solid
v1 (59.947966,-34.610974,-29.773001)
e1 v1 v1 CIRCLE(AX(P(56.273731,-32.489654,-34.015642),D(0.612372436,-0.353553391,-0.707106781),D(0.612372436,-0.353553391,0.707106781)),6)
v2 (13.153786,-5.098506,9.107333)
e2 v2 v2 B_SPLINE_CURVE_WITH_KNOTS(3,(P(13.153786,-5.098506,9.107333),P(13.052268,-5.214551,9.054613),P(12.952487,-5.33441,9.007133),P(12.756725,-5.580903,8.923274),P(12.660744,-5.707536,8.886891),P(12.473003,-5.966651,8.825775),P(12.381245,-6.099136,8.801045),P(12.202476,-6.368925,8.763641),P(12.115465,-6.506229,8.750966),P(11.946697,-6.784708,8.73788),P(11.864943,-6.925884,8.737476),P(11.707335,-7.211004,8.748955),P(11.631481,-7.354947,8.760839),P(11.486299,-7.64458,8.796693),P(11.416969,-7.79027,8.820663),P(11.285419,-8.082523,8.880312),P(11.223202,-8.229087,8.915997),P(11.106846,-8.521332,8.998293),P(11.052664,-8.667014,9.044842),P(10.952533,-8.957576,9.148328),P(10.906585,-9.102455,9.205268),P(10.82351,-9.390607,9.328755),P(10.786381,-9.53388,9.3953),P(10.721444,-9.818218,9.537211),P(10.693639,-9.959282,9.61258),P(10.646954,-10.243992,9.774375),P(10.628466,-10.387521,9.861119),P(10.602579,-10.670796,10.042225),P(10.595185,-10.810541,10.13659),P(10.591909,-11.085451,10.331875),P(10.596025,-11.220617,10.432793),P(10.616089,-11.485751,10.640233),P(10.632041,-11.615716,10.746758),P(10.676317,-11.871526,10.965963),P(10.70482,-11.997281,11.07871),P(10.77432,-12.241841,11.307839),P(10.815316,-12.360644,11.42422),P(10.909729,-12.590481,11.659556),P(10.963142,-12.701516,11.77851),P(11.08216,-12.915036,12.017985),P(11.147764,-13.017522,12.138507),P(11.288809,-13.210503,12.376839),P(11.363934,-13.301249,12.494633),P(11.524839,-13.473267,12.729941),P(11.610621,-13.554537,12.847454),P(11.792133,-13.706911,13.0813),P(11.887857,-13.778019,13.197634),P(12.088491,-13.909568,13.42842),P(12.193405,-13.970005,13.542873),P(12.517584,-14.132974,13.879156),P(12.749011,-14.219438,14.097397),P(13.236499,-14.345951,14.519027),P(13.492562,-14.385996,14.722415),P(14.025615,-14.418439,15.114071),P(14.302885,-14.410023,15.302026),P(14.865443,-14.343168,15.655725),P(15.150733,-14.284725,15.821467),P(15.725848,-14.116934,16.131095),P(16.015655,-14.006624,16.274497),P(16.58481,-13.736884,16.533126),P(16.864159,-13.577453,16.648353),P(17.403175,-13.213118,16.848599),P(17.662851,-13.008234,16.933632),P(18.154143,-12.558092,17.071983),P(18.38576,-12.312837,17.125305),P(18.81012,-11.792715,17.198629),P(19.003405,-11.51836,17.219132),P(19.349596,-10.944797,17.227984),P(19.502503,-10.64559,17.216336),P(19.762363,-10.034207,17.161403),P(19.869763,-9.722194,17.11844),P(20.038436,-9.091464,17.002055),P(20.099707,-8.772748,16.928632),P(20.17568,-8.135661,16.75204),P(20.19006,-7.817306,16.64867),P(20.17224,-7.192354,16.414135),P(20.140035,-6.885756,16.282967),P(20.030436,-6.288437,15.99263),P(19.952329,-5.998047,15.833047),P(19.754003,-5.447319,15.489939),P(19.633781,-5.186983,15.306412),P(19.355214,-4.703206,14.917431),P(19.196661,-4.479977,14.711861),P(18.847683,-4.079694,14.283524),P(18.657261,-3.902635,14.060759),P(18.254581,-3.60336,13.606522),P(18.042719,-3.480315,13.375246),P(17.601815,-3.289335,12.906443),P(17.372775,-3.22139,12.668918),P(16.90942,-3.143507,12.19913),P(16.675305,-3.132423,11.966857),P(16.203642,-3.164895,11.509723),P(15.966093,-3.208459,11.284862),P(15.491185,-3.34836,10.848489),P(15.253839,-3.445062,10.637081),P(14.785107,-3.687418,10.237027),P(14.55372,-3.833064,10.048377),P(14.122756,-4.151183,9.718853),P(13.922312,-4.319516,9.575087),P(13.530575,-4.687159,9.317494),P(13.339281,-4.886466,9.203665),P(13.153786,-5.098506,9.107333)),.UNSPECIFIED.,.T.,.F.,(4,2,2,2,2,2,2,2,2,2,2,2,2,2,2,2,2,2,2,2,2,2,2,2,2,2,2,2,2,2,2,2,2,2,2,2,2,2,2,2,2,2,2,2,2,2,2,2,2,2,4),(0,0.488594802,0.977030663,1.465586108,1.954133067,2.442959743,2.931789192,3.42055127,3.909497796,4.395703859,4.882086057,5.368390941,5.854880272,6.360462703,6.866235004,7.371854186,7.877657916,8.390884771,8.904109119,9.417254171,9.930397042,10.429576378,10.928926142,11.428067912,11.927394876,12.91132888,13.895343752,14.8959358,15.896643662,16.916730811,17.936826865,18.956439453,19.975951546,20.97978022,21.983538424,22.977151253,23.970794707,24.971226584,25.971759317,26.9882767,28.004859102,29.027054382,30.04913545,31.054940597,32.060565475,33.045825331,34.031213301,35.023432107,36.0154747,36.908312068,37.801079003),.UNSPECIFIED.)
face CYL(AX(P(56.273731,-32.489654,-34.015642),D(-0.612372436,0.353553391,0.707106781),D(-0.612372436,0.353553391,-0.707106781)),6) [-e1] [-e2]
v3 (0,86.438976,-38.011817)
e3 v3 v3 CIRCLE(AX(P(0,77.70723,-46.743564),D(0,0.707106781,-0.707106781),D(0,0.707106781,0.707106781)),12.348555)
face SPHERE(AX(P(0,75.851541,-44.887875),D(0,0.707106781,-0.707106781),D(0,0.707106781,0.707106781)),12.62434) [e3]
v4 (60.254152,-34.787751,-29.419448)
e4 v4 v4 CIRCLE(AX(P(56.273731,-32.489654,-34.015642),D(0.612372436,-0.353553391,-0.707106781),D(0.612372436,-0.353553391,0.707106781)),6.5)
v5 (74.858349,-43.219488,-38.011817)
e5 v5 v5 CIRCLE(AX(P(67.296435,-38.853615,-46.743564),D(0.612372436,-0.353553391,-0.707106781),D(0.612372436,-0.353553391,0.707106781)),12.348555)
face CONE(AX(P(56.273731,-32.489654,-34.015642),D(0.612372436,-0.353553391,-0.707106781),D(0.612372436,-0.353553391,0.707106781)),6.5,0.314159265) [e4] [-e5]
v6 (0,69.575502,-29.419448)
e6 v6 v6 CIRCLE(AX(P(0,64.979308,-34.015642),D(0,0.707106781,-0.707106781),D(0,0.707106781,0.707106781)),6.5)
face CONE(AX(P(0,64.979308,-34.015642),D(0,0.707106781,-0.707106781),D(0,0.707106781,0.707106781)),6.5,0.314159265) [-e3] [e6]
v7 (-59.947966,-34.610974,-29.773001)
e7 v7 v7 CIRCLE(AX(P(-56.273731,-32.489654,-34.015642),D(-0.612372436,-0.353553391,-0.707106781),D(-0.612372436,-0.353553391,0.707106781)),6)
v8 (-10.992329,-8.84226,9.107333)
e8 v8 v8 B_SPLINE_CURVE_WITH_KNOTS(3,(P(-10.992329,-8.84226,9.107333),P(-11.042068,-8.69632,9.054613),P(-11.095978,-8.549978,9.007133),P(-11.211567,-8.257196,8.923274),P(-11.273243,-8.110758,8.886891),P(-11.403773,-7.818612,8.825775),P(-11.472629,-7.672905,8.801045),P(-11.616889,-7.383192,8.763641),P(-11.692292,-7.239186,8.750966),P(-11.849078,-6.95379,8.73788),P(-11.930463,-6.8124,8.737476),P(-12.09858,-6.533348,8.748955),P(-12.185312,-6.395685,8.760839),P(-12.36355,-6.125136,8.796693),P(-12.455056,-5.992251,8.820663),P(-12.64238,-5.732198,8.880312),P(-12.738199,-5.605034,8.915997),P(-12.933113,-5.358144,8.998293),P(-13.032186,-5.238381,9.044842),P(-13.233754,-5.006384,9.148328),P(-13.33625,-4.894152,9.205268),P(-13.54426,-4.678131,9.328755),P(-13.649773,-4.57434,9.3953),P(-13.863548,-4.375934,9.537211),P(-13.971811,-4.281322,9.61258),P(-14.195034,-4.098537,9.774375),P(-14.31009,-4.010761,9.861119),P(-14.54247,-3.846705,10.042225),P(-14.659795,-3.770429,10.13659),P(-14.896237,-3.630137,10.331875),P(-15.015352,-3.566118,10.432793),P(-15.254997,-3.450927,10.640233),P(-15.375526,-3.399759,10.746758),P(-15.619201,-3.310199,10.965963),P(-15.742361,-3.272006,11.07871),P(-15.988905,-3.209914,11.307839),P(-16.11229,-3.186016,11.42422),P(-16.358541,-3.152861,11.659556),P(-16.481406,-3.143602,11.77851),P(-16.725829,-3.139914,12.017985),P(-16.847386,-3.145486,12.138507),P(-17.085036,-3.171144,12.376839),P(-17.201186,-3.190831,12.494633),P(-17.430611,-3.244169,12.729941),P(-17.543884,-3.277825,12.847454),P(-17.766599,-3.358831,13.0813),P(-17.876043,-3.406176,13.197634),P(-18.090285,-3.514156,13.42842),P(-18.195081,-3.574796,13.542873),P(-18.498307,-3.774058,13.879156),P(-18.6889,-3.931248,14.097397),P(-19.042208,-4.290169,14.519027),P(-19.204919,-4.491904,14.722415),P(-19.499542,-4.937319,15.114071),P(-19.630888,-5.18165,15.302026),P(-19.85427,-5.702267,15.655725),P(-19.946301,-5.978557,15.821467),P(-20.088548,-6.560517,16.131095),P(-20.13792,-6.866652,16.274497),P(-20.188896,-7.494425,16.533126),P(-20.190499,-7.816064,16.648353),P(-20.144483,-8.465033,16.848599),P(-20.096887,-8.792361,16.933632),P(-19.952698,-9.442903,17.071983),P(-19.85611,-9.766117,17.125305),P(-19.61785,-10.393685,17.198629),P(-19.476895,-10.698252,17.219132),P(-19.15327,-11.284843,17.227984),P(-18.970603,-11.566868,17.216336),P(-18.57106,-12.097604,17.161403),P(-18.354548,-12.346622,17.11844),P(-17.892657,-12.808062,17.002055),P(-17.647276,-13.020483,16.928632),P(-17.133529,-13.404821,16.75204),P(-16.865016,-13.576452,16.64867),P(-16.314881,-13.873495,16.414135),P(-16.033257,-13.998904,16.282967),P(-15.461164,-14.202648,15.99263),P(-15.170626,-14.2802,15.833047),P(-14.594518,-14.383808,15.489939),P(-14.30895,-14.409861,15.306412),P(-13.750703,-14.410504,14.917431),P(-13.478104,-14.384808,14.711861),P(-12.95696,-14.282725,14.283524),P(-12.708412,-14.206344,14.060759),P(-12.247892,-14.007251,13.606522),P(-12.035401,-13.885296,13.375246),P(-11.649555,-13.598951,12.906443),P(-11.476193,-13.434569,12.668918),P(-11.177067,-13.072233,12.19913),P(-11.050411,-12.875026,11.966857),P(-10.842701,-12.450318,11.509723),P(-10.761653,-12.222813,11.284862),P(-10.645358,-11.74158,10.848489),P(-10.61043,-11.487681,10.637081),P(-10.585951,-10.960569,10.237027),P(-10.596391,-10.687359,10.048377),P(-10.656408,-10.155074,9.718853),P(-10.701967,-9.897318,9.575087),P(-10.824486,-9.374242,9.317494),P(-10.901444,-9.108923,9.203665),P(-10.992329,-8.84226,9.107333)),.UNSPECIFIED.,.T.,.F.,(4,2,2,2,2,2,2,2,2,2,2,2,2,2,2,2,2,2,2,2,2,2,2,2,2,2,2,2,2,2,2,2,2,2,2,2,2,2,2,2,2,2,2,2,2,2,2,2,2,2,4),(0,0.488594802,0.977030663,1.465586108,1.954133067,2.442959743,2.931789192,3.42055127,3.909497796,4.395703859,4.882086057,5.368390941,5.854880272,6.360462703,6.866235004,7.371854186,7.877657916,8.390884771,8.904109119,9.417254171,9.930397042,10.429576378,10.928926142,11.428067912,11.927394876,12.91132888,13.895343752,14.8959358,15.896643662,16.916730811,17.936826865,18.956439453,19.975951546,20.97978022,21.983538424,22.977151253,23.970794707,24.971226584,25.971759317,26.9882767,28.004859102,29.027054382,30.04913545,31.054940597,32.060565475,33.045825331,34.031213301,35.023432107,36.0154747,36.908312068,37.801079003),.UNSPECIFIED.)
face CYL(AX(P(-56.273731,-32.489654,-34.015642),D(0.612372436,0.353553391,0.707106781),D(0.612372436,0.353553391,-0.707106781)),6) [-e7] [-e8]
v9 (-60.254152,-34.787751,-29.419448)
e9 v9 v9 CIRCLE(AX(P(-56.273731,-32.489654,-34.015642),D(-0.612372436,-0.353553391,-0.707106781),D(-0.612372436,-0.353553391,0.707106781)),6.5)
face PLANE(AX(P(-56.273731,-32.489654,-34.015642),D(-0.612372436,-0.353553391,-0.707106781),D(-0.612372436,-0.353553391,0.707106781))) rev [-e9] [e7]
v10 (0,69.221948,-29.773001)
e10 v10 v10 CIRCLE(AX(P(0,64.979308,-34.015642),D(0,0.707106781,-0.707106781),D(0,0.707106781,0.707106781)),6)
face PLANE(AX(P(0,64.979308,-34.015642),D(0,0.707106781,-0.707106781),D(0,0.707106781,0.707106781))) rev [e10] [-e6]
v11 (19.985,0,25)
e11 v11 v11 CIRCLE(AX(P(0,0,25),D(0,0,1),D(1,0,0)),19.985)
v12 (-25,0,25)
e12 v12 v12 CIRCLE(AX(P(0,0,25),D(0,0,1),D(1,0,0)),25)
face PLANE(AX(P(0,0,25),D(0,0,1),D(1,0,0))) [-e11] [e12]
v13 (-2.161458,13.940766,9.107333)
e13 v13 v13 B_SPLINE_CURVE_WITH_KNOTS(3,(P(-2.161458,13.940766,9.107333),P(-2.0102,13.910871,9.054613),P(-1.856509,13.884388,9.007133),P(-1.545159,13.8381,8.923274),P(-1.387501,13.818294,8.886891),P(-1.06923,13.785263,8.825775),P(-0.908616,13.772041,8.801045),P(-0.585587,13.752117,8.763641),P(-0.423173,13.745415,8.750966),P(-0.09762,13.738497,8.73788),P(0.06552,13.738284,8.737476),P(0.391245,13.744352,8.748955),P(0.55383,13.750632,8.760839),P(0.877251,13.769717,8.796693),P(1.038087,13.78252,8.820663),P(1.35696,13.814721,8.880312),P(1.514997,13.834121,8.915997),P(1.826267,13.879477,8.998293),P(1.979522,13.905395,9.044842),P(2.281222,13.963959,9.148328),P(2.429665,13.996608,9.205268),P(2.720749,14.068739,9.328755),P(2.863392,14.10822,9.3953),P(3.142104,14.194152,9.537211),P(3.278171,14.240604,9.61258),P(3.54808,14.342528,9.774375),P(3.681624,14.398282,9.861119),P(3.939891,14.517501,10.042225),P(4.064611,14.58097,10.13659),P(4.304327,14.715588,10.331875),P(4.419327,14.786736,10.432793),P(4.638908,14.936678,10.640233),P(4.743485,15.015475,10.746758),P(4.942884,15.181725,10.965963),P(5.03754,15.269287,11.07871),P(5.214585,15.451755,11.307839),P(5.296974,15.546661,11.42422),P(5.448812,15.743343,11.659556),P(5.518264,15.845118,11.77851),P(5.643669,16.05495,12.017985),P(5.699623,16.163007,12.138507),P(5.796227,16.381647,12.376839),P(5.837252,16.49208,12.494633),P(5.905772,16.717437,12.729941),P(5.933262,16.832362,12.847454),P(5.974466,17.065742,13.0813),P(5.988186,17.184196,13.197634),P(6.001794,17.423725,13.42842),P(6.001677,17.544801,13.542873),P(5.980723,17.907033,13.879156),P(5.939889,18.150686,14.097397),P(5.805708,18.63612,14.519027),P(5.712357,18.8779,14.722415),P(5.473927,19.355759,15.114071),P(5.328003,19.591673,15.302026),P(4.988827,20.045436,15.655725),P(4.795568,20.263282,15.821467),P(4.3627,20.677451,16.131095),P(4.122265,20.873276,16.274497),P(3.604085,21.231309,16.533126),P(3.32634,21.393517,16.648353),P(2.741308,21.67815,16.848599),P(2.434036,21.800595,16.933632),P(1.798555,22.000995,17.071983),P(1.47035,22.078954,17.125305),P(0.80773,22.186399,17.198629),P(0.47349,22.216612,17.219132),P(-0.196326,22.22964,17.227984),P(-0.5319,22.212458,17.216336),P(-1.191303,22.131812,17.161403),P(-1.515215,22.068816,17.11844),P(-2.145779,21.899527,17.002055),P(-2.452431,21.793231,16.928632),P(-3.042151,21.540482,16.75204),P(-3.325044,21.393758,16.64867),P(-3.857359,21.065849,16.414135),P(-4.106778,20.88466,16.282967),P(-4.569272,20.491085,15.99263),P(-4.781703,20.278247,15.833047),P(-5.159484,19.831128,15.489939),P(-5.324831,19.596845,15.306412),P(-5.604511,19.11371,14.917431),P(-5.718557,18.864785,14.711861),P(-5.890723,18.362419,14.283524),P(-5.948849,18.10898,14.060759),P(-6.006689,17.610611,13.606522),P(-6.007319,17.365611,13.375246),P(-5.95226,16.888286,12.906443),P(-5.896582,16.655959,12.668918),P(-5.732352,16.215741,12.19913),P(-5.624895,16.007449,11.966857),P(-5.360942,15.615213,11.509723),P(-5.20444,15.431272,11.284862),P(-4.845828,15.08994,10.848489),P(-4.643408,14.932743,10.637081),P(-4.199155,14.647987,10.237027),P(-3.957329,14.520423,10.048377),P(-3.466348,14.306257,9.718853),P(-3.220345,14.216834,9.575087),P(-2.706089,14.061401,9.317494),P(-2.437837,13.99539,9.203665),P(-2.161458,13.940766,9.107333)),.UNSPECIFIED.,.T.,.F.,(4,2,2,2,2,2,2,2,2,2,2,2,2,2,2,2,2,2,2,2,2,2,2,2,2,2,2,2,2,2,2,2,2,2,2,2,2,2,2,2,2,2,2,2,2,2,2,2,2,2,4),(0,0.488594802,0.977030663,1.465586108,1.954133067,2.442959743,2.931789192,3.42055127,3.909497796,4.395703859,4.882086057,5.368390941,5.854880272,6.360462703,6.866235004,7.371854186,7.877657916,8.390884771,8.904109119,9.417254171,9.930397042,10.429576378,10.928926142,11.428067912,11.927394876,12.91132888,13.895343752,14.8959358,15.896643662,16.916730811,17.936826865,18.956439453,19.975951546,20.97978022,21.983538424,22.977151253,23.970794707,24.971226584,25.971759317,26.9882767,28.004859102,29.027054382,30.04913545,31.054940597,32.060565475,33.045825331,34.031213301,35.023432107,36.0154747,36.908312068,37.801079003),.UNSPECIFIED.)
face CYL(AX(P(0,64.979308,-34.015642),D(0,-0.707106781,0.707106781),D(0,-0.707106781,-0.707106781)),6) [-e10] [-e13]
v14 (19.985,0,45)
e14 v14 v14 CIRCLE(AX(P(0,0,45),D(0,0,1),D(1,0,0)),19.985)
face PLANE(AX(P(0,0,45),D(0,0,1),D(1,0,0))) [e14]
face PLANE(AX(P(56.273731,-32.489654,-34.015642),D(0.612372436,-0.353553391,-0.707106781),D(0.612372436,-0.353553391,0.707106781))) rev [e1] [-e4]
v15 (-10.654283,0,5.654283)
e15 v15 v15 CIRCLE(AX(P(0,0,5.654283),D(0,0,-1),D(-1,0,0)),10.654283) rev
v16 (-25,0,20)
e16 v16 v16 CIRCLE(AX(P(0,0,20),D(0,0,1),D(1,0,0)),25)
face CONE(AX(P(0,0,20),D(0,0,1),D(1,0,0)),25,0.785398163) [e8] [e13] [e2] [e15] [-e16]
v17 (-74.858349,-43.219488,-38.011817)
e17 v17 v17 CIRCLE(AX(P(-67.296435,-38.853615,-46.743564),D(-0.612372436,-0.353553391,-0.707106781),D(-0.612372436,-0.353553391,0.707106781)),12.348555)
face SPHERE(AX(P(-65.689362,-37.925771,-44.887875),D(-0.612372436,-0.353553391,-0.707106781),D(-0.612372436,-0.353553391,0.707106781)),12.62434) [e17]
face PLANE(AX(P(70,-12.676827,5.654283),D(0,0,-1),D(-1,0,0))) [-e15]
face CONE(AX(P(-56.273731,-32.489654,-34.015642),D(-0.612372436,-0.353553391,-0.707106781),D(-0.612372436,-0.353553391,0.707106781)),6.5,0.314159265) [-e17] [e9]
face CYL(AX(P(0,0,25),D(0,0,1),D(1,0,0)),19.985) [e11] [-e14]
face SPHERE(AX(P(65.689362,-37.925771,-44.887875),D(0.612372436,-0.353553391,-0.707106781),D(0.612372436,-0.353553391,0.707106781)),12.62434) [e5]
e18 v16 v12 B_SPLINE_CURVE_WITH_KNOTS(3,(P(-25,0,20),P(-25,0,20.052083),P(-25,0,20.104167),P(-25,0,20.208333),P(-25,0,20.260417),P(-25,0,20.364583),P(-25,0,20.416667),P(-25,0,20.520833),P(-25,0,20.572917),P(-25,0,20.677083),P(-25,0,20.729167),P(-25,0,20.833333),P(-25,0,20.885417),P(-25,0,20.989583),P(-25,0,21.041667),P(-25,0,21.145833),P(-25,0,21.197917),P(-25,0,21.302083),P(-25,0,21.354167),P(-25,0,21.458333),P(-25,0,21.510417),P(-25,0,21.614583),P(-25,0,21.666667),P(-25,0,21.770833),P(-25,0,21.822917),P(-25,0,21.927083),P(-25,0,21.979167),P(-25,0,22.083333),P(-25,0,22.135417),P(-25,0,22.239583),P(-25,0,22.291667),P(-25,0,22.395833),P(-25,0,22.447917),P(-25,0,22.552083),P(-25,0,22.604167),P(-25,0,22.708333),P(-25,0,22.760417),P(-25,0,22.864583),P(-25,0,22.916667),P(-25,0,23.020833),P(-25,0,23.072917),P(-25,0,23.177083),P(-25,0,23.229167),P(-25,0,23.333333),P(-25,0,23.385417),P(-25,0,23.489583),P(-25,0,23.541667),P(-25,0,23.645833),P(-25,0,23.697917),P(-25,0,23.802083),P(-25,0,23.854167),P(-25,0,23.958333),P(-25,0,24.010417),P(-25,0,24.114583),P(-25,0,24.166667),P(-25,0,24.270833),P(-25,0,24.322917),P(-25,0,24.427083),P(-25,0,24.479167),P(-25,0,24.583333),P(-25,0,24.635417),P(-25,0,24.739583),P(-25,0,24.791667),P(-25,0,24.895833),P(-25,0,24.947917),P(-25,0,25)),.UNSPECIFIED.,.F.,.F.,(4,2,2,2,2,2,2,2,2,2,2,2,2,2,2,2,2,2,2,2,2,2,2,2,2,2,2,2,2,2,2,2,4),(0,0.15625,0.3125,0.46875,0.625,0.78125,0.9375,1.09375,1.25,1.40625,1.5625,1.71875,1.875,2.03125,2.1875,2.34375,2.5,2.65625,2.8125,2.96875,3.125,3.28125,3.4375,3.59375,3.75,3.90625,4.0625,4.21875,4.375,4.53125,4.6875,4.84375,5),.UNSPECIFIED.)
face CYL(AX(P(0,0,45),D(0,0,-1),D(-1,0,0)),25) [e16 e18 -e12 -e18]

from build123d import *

# Parameters (mm, degrees)
SKETCH1_R                   = 25
BOSS_EXTRUDE1_DEPTH         = 45
CUT_EXTRUDE1_START          = -20
SKETCH2_R                   = 25
SKETCH2_R_2                 = 19.985
CUT_EXTRUDE1_DEPTH          = 20
CHAMFER1_SIZE               = 20
SKETCH3_R                   = 6
BOSS_EXTRUDE2_DEPTH         = 70
CUT_EXTRUDE2_DEPTH          = 70
CUT_EXTRUDE2_DEPTH_BACK     = 70
SKETCH4_W                   = 11.30856595
SKETCH4_H                   = 25.35365412
SKETCH5_R                   = 6.5
BOSS_EXTRUDE3_DEPTH         = 18
BOSS_EXTRUDE3_DRAFT         = -18
CIRPATTERN1_COUNT           = 3
CIRPATTERN1_COPY_1_SKETCH_R = 6.5
CIRPATTERN1_COPY_1_DEPTH    = 18
CIRPATTERN1_COPY_1_DRAFT    = -18
CIRPATTERN1_COPY_2_SKETCH_R = 6.5
CIRPATTERN1_COPY_2_DEPTH    = 18
CIRPATTERN1_COPY_2_DRAFT    = -18


# Read off the part's stored shape, not the designer's step: Dome1
with BuildPart() as part:
    # Sketch1 → Boss-Extrude1 (new body)
    with BuildSketch(Plane.XY):
        with Locations(Location((0, 0, 0), (0, 0, 180))):
            Circle(SKETCH1_R)
    extrude(amount=BOSS_EXTRUDE1_DEPTH)

    # Sketch2 → Cut-Extrude1 (cut)
    with BuildSketch(Plane.XY.offset(45).offset(CUT_EXTRUDE1_START)):
        with Locations(Location((0, 0, 0), (0, 0, 180))):
            Circle(SKETCH2_R)
        Circle(SKETCH2_R_2, mode=Mode.SUBTRACT)
    extrude(amount=CUT_EXTRUDE1_DEPTH, mode=Mode.SUBTRACT)

    # Chamfer1
    chamfer1_edges = [part.edges().sort_by_distance(p)[0] for p in [
        (25, 0, 0),
    ]]
    chamfer(chamfer1_edges, length=CHAMFER1_SIZE)

    # Sketch3 → Boss-Extrude2 (add)
    with BuildSketch(Plane(origin=(0, 0, 0), x_dir=(-1, 0, 0), z_dir=(0, 0.7071067811865475, -0.7071067811865477))):
        with Locations(Location((0, 21.894618235, 0), (0, 0, 291.115116648))):
            Circle(SKETCH3_R)
    boss_extrude2 = extrude(amount=BOSS_EXTRUDE2_DEPTH)

    # Sketch4 → Cut-Extrude2 (cut, two sides: drawn at the far end of the back side and taken through both)
    with BuildSketch(Plane(origin=(0, 0, 0), x_dir=(0, 0, -1), z_dir=(1, 0, 0)).offset(-CUT_EXTRUDE2_DEPTH_BACK)):
        Rectangle(SKETCH4_W, SKETCH4_H)
    extrude(amount=CUT_EXTRUDE2_DEPTH + CUT_EXTRUDE2_DEPTH_BACK, mode=Mode.SUBTRACT)


with BuildPart() as boss_extrude3_tool:
    # Sketch5 → Boss-Extrude3 (with draft: the straight prism first)
    with BuildSketch(Plane(origin=(0, 49.497474683, -49.497474683), x_dir=(1, 0, 0), z_dir=(0, 0.7071067811865476, -0.7071067811865476))):
        with Locations((0, -21.894618235)):
            Circle(SKETCH5_R)
    extrude(amount=BOSS_EXTRUDE3_DEPTH)
    # Boss-Extrude3: the draft: its side faces are tilted about the plane it starts from
    boss_extrude3_sides = [boss_extrude3_tool.faces().sort_by_distance(p)[0] for p in [
        (-6.5, 71.343268739, -40.379602689),
    ]]
    draft(boss_extrude3_sides, Plane(origin=(0, 49.497474683, -49.497474683), x_dir=(1, 0, 0), z_dir=(0, 0.7071067811865476, -0.7071067811865476)), BOSS_EXTRUDE3_DRAFT)


with BuildPart() as part_1:
    add(part.part)

    # Boss-Extrude3: add boss_extrude3_tool
    add(boss_extrude3_tool.part)

    # Dome1 outline → Dome1 (revolve)
    with BuildSketch(Plane(origin=(0, 15.481833025, 15.481833025), x_dir=(1, 0, 0), z_dir=(0, 0.7071067811865476, 0.7071067811865476))):
        with BuildLine():
            Line((0, 88), (12.348554535, 87.999999988))
            ThreePointArc((12.348554535, 87.999999988), (7.944916603, 95.186483631), (0, 98))
            Line((0, 98), (0, 88))
        make_face()
    dome1 = revolve(axis=Axis((0, 15.481833025, 15.481833025), (0, 0.7071067811865476, -0.7071067811865476)))

    # CirPattern1: Boss-Extrude2, Dome1 ×3 about axis
    cirpattern1_axis = Axis((0, 0, 0), (0, 0, 1))
    add([boss_extrude2.rotate(cirpattern1_axis, i * 360 / CIRPATTERN1_COUNT) for i in range(1, CIRPATTERN1_COUNT)])
    add([dome1.rotate(cirpattern1_axis, i * 360 / CIRPATTERN1_COUNT) for i in range(1, CIRPATTERN1_COUNT)])


with BuildPart() as cirpattern1_copy_1_tool:
    # CirPattern1 copy 1 sketch → CirPattern1 copy 1 (with draft: the straight prism first)
    with BuildSketch(Plane(origin=(-42.866070499, -24.748737342, -49.497474683), x_dir=(-0.4999999999999998, 0.8660254037844387, 0), z_dir=(-0.6123724356957946, -0.3535533905932736, -0.7071067811865476))):
        with Locations((0, -21.894618235)):
            Circle(CIRPATTERN1_COPY_1_SKETCH_R)
    extrude(amount=CIRPATTERN1_COPY_1_DEPTH)
    # CirPattern1 copy 1: the draft: its side faces are tilted about the plane it starts from
    cirpattern1_copy_1_sides = [cirpattern1_copy_1_tool.faces().sort_by_distance(p)[0] for p in [
        (-58.535083117, -41.300799494, -40.379602689),
    ]]
    draft(cirpattern1_copy_1_sides, Plane(origin=(-42.866070499, -24.748737342, -49.497474683), x_dir=(-0.4999999999999998, 0.8660254037844387, 0), z_dir=(-0.6123724356957946, -0.3535533905932736, -0.7071067811865476)), CIRPATTERN1_COPY_1_DRAFT)


with BuildPart() as part_2:
    add(part_1.part)

    # CirPattern1 copy 1: add cirpattern1_copy_1_tool
    add(cirpattern1_copy_1_tool.part)


with BuildPart() as cirpattern1_copy_2_tool:
    # CirPattern1 copy 2 sketch → CirPattern1 copy 2 (with draft: the straight prism first)
    with BuildSketch(Plane(origin=(42.866070499, -24.748737342, -49.497474683), x_dir=(-0.5000000000000004, -0.8660254037844384, 0), z_dir=(0.6123724356957944, -0.3535533905932741, -0.7071067811865476))):
        with Locations((0, -21.894618235)):
            Circle(CIRPATTERN1_COPY_2_SKETCH_R)
    extrude(amount=CIRPATTERN1_COPY_2_DEPTH)
    # CirPattern1 copy 2: the draft: its side faces are tilted about the plane it starts from
    cirpattern1_copy_2_sides = [cirpattern1_copy_2_tool.faces().sort_by_distance(p)[0] for p in [
        (65.035083117, -30.042469245, -40.379602689),
    ]]
    draft(cirpattern1_copy_2_sides, Plane(origin=(42.866070499, -24.748737342, -49.497474683), x_dir=(-0.5000000000000004, -0.8660254037844384, 0), z_dir=(0.6123724356957944, -0.3535533905932741, -0.7071067811865476)), CIRPATTERN1_COPY_2_DRAFT)


with BuildPart() as part_3:
    add(part_2.part)

    # CirPattern1 copy 2: add cirpattern1_copy_2_tool
    add(cirpattern1_copy_2_tool.part)


solid = part_3.part
